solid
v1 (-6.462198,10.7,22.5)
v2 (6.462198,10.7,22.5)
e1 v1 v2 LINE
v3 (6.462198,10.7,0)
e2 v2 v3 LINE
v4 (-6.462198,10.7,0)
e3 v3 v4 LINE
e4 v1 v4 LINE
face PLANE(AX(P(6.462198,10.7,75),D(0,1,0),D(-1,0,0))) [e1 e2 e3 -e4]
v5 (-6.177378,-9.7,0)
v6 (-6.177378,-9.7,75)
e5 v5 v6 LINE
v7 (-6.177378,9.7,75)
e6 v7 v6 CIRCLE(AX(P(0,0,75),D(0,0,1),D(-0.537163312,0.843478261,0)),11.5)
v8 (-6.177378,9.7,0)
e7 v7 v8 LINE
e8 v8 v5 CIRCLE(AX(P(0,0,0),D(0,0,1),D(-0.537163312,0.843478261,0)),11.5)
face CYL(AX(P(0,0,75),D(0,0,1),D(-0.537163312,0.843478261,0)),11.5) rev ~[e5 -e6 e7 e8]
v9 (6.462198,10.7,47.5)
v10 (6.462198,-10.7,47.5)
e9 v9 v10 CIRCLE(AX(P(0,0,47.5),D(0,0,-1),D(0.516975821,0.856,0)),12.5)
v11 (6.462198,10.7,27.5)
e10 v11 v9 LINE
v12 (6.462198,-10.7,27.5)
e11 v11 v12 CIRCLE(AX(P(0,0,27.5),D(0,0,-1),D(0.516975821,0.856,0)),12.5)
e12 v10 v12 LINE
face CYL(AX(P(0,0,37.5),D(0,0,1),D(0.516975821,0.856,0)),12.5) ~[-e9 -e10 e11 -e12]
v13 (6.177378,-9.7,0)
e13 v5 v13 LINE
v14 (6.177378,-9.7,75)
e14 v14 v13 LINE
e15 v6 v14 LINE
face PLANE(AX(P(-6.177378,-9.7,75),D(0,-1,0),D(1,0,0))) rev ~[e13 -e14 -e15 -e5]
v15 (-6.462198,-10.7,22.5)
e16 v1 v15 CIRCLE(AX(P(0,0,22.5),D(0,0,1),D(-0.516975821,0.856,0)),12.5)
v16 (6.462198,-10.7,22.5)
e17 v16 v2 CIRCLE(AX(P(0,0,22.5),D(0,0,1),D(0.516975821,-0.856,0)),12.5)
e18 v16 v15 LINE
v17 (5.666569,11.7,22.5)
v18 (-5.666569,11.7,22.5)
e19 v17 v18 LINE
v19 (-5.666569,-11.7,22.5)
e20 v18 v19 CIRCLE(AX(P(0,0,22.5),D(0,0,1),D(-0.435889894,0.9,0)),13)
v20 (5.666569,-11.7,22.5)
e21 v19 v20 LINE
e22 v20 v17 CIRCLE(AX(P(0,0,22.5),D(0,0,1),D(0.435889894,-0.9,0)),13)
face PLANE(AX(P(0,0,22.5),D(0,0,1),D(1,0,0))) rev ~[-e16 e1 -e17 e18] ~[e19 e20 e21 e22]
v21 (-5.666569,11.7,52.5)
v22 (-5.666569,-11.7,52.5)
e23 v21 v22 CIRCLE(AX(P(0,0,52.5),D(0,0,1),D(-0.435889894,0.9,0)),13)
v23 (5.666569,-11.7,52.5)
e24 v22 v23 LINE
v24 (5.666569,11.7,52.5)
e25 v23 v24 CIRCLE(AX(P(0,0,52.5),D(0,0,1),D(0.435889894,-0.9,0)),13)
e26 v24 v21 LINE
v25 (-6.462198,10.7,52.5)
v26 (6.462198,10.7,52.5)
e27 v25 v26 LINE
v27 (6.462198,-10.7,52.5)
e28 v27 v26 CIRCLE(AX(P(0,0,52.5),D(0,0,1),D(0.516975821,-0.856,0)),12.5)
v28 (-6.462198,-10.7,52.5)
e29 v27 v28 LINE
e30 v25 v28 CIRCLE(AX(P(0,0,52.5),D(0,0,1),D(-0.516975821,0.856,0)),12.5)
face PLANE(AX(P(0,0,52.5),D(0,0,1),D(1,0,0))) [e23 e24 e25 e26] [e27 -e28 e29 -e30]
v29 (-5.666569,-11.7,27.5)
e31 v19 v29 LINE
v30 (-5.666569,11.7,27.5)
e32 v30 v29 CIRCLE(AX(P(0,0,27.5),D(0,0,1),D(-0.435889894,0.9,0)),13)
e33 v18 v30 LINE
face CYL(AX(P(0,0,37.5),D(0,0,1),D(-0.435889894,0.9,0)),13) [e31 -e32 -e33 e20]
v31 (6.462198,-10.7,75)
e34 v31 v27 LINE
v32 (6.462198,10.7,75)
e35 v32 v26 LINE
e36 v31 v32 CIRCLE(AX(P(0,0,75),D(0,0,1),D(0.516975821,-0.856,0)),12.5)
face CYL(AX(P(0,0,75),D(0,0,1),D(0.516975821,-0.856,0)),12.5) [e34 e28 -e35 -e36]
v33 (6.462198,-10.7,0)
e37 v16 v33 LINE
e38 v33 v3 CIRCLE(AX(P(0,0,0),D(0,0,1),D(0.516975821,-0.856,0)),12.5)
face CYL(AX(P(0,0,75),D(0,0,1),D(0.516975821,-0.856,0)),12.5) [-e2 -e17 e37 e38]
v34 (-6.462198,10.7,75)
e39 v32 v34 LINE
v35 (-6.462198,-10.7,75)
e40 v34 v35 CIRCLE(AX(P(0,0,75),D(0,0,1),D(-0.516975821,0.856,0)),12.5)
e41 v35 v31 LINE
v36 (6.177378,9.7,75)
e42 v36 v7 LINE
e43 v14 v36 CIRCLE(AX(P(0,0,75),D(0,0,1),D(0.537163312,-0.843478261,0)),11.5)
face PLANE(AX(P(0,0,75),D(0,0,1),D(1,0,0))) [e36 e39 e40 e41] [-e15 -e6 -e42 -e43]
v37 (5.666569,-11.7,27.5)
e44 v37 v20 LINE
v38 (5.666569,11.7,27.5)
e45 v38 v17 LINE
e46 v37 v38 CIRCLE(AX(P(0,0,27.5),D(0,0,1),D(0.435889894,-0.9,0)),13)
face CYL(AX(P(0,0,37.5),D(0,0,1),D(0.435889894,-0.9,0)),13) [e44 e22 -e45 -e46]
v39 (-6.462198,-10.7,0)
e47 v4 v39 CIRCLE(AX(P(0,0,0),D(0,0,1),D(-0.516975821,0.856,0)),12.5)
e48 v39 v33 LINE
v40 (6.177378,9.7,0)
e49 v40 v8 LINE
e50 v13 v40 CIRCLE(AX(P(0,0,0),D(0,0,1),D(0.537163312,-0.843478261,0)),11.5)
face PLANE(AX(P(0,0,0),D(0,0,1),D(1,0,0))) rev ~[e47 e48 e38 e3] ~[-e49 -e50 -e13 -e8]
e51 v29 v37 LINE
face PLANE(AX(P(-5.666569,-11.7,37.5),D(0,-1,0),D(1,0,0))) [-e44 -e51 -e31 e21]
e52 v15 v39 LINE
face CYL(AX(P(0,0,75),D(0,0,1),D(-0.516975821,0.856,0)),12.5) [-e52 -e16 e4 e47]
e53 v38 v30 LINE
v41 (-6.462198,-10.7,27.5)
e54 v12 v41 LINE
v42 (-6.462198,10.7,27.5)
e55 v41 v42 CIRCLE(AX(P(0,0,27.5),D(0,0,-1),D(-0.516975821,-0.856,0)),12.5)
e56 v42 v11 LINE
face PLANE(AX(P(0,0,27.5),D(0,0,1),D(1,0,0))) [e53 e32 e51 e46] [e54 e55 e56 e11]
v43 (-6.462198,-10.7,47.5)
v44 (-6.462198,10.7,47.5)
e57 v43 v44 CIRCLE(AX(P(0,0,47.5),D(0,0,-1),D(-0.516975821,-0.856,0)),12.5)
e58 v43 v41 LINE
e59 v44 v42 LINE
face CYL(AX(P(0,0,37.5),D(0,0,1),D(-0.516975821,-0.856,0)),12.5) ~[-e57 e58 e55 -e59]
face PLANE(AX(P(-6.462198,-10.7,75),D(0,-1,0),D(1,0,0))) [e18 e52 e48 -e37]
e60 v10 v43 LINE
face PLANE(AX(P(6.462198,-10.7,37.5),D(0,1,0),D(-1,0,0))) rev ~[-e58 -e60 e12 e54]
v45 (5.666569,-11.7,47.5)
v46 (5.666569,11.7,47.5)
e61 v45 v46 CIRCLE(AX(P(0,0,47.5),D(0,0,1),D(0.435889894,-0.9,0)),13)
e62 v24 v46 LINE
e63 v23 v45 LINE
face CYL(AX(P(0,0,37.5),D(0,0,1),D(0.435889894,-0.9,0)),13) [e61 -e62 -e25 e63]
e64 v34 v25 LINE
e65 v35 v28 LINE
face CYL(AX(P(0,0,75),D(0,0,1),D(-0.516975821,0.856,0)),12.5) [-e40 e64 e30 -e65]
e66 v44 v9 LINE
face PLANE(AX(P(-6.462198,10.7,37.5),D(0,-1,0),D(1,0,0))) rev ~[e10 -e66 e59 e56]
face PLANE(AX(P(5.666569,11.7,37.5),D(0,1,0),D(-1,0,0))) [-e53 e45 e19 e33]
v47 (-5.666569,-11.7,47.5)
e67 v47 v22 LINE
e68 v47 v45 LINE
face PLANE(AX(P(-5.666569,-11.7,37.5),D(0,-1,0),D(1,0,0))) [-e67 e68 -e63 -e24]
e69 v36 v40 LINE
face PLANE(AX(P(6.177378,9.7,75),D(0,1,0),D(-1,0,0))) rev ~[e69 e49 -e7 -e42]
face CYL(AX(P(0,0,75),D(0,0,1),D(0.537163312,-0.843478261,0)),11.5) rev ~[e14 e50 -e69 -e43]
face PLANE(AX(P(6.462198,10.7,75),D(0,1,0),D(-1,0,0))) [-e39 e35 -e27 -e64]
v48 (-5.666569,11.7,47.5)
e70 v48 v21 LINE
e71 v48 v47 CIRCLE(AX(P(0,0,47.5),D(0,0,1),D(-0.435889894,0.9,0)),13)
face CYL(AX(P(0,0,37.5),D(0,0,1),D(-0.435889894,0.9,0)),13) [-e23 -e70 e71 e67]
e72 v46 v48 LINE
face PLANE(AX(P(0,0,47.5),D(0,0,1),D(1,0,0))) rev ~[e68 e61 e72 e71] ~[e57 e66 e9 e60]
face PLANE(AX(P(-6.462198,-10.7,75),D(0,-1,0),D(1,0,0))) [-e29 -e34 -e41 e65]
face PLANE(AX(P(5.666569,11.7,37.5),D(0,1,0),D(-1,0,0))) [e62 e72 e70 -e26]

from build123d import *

# Parameters (mm, degrees)
F0_R      = 11.5
F0_R_2    = 6.5
F1_DEPTH  = 75
F2_W      = 40
F2_H      = 22.7775762856
F3_DEPTH  = 75
F5_DEPTH  = 75
F7_DEPTH  = 75
F10_DEPTH = 15
F12_DEPTH = 10


# Not quite as in the source:
# - after a boolean that leaves OpenCascade's solid faulty, fix() repairs it


with BuildPart() as f1:
    # F0 (on Top) → F1 (new body)
    with BuildSketch(Plane.XY):
        Circle(F0_R)
        Circle(F0_R_2, mode=Mode.SUBTRACT)
    extrude(amount=F1_DEPTH)

    # F2 (on face) → F3 (cut, through all)
    with BuildSketch(Plane.XY.offset(75)):
        with Locations((0, -21.0887881428)):
            Rectangle(F2_W, F2_H)
        Polygon((-20, 9.7), (20, 9.7), (20, 33.5304923356), (-20, 28.7892241031), align=None)
    extrude(amount=-F3_DEPTH, mode=Mode.SUBTRACT)

    # F4 (on face) → F5 (join)
    with BuildSketch(Plane.XY.offset(75)):
        with BuildLine():
            Line((6.4621977686, 10.7), (-6.4621977686, 10.7))
            ThreePointArc((-6.4621977686, 10.7), (-12.5, 0), (-6.4621977686, -10.7))
            Line((-6.4621977686, -10.7), (6.4621977686, -10.7))
            ThreePointArc((6.4621977686, -10.7), (12.5, 0), (6.4621977686, 10.7))
        make_face()
        with BuildLine():
            ThreePointArc((-6.1773780846, -9.7), (-11.5, 0), (-6.1773780846, 9.7))
            Line((-6.1773780846, 9.7), (6.1773780846, 9.7))
            ThreePointArc((6.1773780846, 9.7), (11.5, 0), (6.1773780846, -9.7))
            Line((6.1773780846, -9.7), (-6.1773780846, -9.7))
        make_face(mode=Mode.SUBTRACT)
    extrude(amount=-F5_DEPTH)

    # F6 (on face) → F7 (cut)
    with BuildSketch(Plane.XY.offset(75)):
        with BuildLine():
            Line((-6.1773780846, -9.7), (6.1773780846, -9.7))
            ThreePointArc((6.1773780846, -9.7), (11.5, 0), (6.1773780846, 9.7))
            Line((6.1773780846, 9.7), (-6.1773780846, 9.7))
            ThreePointArc((-6.1773780846, 9.7), (-11.5, 0), (-6.1773780846, -9.7))
        make_face()
    extrude(amount=-F7_DEPTH, mode=Mode.SUBTRACT)

    # F9 (on mid) → F10 (join, symmetric)
    with BuildSketch(Plane.XY.offset(37.5)):
        with BuildLine():
            Line((5.6665686266, 11.7), (-5.6665686266, 11.7))
            ThreePointArc((-5.6665686266, 11.7), (-13, 0), (-5.6665686266, -11.7))
            Line((-5.6665686266, -11.7), (5.6665686266, -11.7))
            ThreePointArc((5.6665686266, -11.7), (13, 0), (5.6665686266, 11.7))
        make_face()
        with BuildLine():
            ThreePointArc((-6.1773780846, -9.7), (-11.5, 0), (-6.1773780846, 9.7))
            Line((-6.1773780846, 9.7), (6.1773780846, 9.7))
            ThreePointArc((6.1773780846, 9.7), (11.5, 0), (6.1773780846, -9.7))
            Line((6.1773780846, -9.7), (-6.1773780846, -9.7))
        make_face(mode=Mode.SUBTRACT)
    extrude(amount=F10_DEPTH, both=True)

    add(f1.part.fix(), mode=Mode.REPLACE)

    # F11 (on mid) → F12 (cut, symmetric)
    with BuildSketch(Plane.XY.offset(37.5)):
        with BuildLine():
            Line((-5.6665686266, -11.7), (5.6665686266, -11.7))
            ThreePointArc((5.6665686266, -11.7), (13, 0), (5.6665686266, 11.7))
            Line((5.6665686266, 11.7), (-5.6665686266, 11.7))
            ThreePointArc((-5.6665686266, 11.7), (-13, 0), (-5.6665686266, -11.7))
        make_face()
        with BuildLine():
            ThreePointArc((6.4621977686, 10.7), (12.5, 0), (6.4621977686, -10.7))
            Line((6.4621977686, -10.7), (-6.4621977686, -10.7))
            ThreePointArc((-6.4621977686, -10.7), (-12.5, 0), (-6.4621977686, 10.7))
            Line((-6.4621977686, 10.7), (6.4621977686, 10.7))
        make_face(mode=Mode.SUBTRACT)
    extrude(amount=F12_DEPTH, both=True, mode=Mode.SUBTRACT)

    add(f1.part.fix(), mode=Mode.REPLACE)


solid = f1.part
